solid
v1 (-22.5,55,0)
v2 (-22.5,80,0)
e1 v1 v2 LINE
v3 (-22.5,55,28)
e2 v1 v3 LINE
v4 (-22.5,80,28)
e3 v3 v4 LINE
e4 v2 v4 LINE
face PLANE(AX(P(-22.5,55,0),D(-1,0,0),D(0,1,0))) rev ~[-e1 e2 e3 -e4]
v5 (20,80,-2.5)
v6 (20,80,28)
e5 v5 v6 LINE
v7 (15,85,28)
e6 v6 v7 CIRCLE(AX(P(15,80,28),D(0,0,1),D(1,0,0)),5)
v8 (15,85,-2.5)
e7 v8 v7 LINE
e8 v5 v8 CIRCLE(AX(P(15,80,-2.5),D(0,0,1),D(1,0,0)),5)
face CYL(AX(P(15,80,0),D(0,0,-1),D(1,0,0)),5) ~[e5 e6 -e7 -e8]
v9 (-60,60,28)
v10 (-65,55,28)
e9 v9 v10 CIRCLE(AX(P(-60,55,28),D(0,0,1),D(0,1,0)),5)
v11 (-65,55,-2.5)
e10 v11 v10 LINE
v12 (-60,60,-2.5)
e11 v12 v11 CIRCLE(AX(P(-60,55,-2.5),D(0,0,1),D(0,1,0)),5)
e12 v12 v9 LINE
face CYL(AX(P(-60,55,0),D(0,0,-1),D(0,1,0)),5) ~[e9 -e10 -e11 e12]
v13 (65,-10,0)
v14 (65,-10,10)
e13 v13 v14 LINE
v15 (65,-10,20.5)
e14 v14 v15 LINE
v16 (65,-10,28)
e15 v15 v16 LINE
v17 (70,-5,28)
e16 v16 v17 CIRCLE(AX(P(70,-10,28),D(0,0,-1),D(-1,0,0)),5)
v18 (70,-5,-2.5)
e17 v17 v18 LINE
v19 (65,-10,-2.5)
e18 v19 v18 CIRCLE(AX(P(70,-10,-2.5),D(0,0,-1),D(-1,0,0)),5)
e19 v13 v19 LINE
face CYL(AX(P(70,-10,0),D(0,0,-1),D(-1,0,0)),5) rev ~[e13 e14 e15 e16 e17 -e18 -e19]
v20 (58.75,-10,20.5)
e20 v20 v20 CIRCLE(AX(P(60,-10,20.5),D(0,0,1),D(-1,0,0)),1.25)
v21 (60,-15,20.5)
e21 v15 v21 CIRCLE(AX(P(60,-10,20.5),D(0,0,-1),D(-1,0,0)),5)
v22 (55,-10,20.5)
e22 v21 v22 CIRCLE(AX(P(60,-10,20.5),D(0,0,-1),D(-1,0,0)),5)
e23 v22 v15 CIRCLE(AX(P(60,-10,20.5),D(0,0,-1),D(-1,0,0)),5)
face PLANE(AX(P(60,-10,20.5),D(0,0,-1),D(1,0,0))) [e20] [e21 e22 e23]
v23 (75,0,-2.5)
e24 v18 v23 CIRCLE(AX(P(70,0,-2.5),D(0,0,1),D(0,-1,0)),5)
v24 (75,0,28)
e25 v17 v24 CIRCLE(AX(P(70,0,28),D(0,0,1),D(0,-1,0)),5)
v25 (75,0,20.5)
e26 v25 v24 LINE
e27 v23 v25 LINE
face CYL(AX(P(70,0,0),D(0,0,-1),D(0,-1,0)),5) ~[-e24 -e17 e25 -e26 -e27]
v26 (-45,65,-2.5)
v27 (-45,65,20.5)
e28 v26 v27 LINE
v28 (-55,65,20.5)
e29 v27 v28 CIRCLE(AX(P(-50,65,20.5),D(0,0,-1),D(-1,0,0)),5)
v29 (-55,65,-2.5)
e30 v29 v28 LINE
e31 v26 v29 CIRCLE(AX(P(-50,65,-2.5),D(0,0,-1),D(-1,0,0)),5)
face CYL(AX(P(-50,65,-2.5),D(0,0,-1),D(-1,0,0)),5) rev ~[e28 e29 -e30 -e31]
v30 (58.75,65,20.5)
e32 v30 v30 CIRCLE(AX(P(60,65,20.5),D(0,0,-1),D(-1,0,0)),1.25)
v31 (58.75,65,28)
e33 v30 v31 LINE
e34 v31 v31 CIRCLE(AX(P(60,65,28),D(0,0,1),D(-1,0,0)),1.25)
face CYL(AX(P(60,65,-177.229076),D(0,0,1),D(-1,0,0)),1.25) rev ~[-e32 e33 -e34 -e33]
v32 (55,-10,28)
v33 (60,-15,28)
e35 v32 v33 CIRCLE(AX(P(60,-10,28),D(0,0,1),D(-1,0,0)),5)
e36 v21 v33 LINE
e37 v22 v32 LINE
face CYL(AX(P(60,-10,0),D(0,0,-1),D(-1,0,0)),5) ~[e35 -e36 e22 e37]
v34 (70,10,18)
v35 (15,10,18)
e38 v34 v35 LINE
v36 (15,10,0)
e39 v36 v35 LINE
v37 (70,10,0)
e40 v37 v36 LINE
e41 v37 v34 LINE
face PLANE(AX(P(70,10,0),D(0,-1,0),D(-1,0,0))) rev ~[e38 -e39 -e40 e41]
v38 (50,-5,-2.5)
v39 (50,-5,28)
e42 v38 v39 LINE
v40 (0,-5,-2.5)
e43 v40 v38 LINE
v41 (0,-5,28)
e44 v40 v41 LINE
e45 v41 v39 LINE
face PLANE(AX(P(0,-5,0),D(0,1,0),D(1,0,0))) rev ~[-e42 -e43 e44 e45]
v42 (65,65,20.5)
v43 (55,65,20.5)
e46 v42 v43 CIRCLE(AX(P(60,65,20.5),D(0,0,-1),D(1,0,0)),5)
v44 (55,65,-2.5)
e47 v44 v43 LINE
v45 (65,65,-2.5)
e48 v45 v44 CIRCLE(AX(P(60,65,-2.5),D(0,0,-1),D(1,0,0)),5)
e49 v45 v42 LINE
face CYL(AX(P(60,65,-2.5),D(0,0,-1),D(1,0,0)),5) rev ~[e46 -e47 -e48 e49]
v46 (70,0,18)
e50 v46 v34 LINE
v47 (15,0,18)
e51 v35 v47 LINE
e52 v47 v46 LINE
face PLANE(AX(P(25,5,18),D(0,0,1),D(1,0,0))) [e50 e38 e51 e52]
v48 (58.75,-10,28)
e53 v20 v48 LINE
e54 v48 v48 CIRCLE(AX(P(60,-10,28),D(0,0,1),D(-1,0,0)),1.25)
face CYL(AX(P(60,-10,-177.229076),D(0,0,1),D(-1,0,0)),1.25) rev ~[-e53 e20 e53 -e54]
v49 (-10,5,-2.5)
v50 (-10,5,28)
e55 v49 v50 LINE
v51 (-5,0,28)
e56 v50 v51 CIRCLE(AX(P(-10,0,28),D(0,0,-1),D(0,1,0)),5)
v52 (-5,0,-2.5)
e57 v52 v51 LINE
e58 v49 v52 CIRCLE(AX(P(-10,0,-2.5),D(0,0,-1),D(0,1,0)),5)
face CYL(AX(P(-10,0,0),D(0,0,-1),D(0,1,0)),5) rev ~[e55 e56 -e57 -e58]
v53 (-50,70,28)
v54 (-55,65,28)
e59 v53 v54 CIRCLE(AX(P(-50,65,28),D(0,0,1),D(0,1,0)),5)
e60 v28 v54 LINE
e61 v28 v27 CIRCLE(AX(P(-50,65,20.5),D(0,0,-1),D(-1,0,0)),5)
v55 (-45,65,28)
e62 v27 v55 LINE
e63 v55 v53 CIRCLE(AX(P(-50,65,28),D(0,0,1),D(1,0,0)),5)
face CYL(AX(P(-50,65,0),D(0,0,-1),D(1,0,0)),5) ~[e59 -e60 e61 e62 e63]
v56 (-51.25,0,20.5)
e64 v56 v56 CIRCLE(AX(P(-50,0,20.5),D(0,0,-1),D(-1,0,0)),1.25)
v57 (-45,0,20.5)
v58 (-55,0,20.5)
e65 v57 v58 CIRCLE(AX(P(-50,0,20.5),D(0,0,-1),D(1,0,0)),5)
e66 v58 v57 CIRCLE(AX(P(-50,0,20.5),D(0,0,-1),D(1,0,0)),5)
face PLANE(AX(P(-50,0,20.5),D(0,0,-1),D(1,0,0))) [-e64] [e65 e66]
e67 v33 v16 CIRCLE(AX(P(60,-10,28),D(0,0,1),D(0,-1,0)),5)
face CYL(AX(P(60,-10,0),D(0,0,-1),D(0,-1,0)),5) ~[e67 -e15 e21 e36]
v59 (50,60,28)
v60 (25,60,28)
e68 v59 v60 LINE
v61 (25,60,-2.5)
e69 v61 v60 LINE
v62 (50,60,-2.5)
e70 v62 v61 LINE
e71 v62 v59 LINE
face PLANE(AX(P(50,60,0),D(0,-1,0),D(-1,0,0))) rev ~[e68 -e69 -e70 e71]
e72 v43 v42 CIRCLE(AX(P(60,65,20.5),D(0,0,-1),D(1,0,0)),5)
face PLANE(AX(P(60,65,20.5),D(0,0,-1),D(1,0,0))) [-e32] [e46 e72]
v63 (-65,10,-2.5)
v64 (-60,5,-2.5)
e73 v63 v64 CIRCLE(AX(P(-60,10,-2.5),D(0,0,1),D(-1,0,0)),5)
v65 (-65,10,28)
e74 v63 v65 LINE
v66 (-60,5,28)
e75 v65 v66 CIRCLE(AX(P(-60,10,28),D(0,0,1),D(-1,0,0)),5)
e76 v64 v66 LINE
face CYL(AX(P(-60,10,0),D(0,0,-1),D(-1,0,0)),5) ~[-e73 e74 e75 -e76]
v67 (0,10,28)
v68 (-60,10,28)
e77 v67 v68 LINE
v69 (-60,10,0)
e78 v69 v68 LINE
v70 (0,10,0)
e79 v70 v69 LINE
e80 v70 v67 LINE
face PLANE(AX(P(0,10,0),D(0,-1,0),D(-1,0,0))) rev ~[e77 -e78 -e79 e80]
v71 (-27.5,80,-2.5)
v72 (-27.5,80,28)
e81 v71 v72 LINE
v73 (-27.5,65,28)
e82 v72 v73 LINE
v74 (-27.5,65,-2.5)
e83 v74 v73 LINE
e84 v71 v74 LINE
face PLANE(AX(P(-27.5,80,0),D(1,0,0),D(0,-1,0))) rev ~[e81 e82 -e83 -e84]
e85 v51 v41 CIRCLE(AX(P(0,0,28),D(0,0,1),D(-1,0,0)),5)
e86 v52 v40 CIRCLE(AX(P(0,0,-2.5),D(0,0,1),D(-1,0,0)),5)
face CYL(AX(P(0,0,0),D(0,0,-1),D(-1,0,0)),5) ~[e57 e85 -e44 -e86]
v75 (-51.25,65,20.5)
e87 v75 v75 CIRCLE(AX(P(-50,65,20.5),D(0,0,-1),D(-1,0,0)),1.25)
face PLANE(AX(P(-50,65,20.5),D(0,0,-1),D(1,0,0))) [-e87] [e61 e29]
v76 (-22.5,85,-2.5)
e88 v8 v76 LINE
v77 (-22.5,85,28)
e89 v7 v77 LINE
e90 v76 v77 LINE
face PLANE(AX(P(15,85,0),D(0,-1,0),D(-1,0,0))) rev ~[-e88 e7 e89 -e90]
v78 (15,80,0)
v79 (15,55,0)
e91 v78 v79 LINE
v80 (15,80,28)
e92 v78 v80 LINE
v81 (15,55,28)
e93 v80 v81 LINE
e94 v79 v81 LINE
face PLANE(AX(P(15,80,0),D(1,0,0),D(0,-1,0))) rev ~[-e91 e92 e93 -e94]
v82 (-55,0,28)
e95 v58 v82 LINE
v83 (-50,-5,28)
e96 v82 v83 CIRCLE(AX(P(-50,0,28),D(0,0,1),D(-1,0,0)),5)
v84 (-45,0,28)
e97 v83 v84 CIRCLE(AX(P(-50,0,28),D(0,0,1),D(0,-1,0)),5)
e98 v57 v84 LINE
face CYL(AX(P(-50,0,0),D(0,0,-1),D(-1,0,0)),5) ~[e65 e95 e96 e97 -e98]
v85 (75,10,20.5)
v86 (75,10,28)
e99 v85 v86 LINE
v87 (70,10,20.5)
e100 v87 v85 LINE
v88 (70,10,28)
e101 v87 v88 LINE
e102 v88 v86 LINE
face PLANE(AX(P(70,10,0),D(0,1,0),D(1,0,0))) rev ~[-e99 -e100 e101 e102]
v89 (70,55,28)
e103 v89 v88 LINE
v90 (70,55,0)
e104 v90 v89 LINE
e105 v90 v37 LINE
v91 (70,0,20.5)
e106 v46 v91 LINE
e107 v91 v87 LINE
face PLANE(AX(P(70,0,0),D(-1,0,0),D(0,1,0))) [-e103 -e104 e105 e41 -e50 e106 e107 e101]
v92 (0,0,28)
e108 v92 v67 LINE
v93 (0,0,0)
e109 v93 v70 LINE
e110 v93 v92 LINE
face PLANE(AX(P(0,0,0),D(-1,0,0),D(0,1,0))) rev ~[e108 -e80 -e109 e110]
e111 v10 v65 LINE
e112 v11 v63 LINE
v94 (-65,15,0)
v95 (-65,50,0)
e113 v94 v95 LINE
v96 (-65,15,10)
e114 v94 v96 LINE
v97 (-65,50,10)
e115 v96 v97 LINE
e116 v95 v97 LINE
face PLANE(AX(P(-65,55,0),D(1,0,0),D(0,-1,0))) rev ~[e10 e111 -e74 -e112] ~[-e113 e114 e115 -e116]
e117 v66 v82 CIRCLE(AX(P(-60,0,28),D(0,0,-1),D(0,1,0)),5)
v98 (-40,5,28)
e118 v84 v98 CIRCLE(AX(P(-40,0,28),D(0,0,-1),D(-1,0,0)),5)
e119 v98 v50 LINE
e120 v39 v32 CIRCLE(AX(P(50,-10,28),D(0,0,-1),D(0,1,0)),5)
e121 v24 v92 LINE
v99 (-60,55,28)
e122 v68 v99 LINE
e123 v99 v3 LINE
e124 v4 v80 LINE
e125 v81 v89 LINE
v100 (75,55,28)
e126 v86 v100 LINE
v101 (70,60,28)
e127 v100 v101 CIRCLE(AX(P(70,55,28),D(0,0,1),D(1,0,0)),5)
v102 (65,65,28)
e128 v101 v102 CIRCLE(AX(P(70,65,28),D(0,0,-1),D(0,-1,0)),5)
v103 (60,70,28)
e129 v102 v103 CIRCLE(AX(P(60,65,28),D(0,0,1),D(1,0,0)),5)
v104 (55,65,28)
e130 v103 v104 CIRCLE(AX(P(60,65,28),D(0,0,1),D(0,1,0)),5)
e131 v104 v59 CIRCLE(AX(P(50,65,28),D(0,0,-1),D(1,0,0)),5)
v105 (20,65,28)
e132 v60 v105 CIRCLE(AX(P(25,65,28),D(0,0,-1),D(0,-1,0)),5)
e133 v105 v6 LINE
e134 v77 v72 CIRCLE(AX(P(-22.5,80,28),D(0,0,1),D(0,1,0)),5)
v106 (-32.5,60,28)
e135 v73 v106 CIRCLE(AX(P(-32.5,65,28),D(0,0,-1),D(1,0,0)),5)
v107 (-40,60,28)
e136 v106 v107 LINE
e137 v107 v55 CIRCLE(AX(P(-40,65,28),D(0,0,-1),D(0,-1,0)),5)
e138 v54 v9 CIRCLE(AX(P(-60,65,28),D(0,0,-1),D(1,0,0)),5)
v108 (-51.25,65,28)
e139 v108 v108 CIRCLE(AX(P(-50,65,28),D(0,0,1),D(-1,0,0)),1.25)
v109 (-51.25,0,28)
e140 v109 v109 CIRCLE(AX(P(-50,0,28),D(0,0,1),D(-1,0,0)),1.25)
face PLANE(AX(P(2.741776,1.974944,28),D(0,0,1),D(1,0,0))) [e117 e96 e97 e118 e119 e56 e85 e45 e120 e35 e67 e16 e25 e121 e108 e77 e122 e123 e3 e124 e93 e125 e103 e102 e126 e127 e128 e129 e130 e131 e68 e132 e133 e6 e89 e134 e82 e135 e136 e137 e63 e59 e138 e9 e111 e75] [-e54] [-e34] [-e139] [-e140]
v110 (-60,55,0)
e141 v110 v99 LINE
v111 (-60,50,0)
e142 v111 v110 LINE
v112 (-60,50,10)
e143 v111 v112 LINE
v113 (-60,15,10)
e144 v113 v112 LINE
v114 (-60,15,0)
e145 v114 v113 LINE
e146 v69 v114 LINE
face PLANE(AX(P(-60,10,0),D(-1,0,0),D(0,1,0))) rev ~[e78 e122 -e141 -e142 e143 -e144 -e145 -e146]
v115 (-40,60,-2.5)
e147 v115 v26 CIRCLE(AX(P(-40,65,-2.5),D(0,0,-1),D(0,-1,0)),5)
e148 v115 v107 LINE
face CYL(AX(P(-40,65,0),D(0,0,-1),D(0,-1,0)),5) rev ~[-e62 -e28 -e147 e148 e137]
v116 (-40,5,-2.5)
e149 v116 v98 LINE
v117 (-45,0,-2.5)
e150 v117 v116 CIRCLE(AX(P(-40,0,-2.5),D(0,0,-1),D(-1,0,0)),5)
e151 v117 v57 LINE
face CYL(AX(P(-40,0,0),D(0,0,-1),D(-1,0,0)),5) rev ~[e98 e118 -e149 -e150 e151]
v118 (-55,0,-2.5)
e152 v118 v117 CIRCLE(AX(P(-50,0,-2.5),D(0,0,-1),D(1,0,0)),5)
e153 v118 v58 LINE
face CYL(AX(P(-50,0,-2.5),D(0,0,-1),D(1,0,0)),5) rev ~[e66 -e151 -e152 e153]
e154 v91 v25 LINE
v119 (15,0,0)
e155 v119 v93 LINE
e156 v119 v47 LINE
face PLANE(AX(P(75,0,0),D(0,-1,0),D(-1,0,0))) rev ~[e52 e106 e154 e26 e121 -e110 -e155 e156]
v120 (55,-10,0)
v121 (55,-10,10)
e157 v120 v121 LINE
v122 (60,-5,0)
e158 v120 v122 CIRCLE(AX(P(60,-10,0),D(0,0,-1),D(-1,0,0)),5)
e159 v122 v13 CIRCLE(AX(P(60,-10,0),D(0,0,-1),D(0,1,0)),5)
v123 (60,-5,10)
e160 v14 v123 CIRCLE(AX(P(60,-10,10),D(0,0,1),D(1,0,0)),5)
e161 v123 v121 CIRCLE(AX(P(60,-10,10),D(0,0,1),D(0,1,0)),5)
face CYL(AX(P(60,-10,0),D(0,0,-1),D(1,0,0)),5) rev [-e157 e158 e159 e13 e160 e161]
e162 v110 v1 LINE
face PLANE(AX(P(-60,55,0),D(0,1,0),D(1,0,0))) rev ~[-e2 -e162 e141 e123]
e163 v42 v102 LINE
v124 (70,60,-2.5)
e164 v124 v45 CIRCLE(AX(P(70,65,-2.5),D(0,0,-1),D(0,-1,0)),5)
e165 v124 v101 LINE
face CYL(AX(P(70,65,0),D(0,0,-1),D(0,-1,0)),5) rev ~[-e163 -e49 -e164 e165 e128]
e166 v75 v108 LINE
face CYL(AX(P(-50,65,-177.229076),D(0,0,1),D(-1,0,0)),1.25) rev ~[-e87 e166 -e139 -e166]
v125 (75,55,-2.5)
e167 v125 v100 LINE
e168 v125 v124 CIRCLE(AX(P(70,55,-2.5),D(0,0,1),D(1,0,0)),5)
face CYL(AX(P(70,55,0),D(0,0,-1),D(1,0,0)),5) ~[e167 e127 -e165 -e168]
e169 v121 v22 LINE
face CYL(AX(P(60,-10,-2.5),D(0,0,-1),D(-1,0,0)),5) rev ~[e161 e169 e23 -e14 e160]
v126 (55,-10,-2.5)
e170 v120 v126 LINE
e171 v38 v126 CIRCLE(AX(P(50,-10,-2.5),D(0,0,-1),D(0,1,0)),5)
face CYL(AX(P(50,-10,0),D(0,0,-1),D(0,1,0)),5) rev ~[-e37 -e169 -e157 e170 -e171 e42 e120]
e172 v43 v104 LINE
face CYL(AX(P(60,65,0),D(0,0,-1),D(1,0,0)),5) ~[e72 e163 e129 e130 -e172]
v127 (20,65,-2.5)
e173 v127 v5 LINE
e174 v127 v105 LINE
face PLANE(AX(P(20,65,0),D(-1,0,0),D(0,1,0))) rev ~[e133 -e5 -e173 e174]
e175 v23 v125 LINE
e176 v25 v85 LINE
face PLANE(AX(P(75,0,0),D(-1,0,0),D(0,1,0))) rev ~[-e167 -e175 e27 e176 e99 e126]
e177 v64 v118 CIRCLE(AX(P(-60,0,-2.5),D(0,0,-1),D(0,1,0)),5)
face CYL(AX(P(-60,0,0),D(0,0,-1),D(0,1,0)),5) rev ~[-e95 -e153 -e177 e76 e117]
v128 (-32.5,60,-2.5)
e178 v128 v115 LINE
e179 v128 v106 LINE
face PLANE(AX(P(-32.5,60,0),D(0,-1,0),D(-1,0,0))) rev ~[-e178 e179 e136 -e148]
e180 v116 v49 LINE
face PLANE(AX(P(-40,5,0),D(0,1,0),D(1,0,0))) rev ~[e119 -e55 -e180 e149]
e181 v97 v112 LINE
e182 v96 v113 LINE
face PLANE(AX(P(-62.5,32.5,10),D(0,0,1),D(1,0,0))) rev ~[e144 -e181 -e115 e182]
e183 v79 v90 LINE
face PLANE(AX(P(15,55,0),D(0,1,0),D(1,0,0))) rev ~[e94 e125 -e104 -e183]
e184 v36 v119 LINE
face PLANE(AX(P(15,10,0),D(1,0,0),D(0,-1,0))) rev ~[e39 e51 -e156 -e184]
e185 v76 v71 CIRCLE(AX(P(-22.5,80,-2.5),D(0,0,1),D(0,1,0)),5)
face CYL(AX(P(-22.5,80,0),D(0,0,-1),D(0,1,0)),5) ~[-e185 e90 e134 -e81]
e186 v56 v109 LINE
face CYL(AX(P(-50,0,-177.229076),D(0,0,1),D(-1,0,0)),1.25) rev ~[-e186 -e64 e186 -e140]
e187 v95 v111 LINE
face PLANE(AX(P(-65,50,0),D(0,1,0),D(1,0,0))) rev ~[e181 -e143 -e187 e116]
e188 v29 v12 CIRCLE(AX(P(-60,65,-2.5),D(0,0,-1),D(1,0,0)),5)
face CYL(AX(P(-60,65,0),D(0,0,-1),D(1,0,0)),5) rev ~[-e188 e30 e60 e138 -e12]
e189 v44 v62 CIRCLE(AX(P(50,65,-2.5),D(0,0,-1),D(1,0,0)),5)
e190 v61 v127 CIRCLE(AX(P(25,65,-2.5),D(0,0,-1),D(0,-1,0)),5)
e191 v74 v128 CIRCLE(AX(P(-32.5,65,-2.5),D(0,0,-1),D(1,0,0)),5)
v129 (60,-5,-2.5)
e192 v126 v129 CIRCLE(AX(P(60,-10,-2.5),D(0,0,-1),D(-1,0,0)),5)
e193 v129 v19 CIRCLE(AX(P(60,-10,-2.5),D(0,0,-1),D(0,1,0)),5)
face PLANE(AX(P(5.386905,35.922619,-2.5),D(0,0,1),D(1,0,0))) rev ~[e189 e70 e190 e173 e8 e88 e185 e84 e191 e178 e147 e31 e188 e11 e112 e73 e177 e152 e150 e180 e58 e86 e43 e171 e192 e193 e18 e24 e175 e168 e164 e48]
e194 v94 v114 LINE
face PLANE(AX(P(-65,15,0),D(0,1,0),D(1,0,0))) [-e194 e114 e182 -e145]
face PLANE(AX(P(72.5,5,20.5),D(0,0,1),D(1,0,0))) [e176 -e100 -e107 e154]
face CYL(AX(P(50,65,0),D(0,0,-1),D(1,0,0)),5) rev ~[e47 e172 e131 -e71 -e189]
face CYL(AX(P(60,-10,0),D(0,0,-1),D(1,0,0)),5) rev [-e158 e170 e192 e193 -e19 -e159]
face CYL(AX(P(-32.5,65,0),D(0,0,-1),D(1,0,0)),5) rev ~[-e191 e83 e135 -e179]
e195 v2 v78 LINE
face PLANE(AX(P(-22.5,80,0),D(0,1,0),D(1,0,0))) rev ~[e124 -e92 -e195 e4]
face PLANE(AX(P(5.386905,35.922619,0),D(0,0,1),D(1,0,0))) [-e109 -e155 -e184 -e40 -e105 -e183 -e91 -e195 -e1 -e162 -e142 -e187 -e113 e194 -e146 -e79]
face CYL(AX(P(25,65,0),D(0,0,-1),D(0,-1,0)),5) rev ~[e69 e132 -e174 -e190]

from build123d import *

# Parameters (mm, degrees)
F1_W      = 5
F1_H      = 10
F1_H_2    = 35
F2_DEPTH  = 2.5
F3_DEPTH  = 28
F5_D      = 2.5
F6_DEPTH  = 20.5
F7_DEPTH  = 18
F8_DEPTH  = 10
F9_R      = 1.25
F10_DEPTH = 23


with BuildPart() as f2:
    # F1 (on Top) → F2 (new body)
    with BuildSketch(Plane.XY):
        Polygon((0, 0), (70, 0), (70, 10), (70, 55), (15, 55), (15, 80), (-22.5, 80), (-22.5, 55), (-60, 55), (-60, 50), (-60, 15), (-60, 10), (0, 10), align=None)
        with BuildLine():
            Line((70, 10), (75, 10))
            Line((75, 10), (75, 55))
            ThreePointArc((75, 55), (73.5355339059, 58.5355339059), (70, 60))
            ThreePointArc((70, 60), (66.4644660941, 61.4644660941), (65, 65))
            ThreePointArc((65, 65), (60, 60), (55, 65))
            ThreePointArc((55, 65), (53.5355339059, 61.4644660941), (50, 60))
            Line((50, 60), (25, 60))
            ThreePointArc((25, 60), (21.4644660941, 61.4644660941), (20, 65))
            Line((20, 65), (20, 80))
            ThreePointArc((20, 80), (18.5355339059, 83.5355339059), (15, 85))
            Line((15, 85), (-22.5, 85))
            ThreePointArc((-22.5, 85), (-26.0355339059, 83.5355339059), (-27.5, 80))
            Line((-27.5, 80), (-27.5, 65))
            ThreePointArc((-27.5, 65), (-28.9644660941, 61.4644660941), (-32.5, 60))
            Line((-32.5, 60), (-40, 60))
            ThreePointArc((-40, 60), (-43.5355339059, 61.4644660941), (-45, 65))
            ThreePointArc((-45, 65), (-50, 60), (-55, 65))
            ThreePointArc((-55, 65), (-56.4644660941, 61.4644660941), (-60, 60))
            ThreePointArc((-60, 60), (-63.5355339059, 58.5355339059), (-65, 55))
            Line((-65, 55), (-65, 50))
            Line((-65, 50), (-60, 50))
            Line((-60, 50), (-60, 55))
            Line((-60, 55), (-22.5, 55))
            Line((-22.5, 55), (-22.5, 80))
            Line((-22.5, 80), (15, 80))
            Line((15, 80), (15, 55))
            Line((15, 55), (70, 55))
            Line((70, 55), (70, 10))
        make_face()
        with Locations((72.5, 5)):
            Rectangle(F1_W, F1_H)
        with BuildLine():
            ThreePointArc((-50, 70), (-53.5355339059, 68.5355339059), (-55, 65))
            ThreePointArc((-55, 65), (-50, 60), (-45, 65))
            ThreePointArc((-45, 65), (-46.4644660941, 68.5355339059), (-50, 70))
        make_face()
        with BuildLine():
            ThreePointArc((55, 65), (60, 60), (65, 65))
            ThreePointArc((65, 65), (63.5355339059, 68.5355339059), (60, 70))
            ThreePointArc((60, 70), (56.4644660941, 68.5355339059), (55, 65))
        make_face()
        with BuildLine():
            ThreePointArc((-45, 0), (-50, 5), (-55, 0))
            ThreePointArc((-55, 0), (-53.5355339059, -3.5355339059), (-50, -5))
            ThreePointArc((-50, -5), (-46.4644660941, -3.5355339059), (-45, 0))
        make_face()
        with Locations((-62.5, 32.5)):
            Rectangle(F1_W, F1_H_2)
        with BuildLine():
            ThreePointArc((70, -5), (73.5355339059, -3.5355339059), (75, 0))
            Line((75, 0), (70, 0))
            Line((70, 0), (0, 0))
            Line((0, 0), (0, 10))
            Line((0, 10), (-60, 10))
            Line((-60, 10), (-60, 15))
            Line((-60, 15), (-65, 15))
            Line((-65, 15), (-65, 10))
            ThreePointArc((-65, 10), (-63.5355339059, 6.4644660941), (-60, 5))
            ThreePointArc((-60, 5), (-56.4644660941, 3.5355339059), (-55, 0))
            ThreePointArc((-55, 0), (-50, 5), (-45, 0))
            ThreePointArc((-45, 0), (-43.5355339059, 3.5355339059), (-40, 5))
            Line((-40, 5), (-10, 5))
            ThreePointArc((-10, 5), (-6.4644660941, 3.5355339059), (-5, 0))
            ThreePointArc((-5, 0), (-3.5355339059, -3.5355339059), (0, -5))
            Line((0, -5), (50, -5))
            ThreePointArc((50, -5), (53.5355339059, -6.4644660941), (55, -10))
            ThreePointArc((55, -10), (56.4644660941, -6.4644660941), (60, -5))
            ThreePointArc((60, -5), (63.5355339059, -6.4644660941), (65, -10))
            ThreePointArc((65, -10), (66.4644660941, -6.4644660941), (70, -5))
        make_face()
    extrude(amount=-F2_DEPTH)

    # F1 (on Top) → F3 (join)
    with BuildSketch(Plane.XY):
        with BuildLine():
            ThreePointArc((70, -5), (73.5355339059, -3.5355339059), (75, 0))
            Line((75, 0), (70, 0))
            Line((70, 0), (0, 0))
            Line((0, 0), (0, 10))
            Line((0, 10), (-60, 10))
            Line((-60, 10), (-60, 15))
            Line((-60, 15), (-65, 15))
            Line((-65, 15), (-65, 10))
            ThreePointArc((-65, 10), (-63.5355339059, 6.4644660941), (-60, 5))
            ThreePointArc((-60, 5), (-56.4644660941, 3.5355339059), (-55, 0))
            ThreePointArc((-55, 0), (-50, 5), (-45, 0))
            ThreePointArc((-45, 0), (-43.5355339059, 3.5355339059), (-40, 5))
            Line((-40, 5), (-10, 5))
            ThreePointArc((-10, 5), (-6.4644660941, 3.5355339059), (-5, 0))
            ThreePointArc((-5, 0), (-3.5355339059, -3.5355339059), (0, -5))
            Line((0, -5), (50, -5))
            ThreePointArc((50, -5), (53.5355339059, -6.4644660941), (55, -10))
            ThreePointArc((55, -10), (56.4644660941, -6.4644660941), (60, -5))
            ThreePointArc((60, -5), (63.5355339059, -6.4644660941), (65, -10))
            ThreePointArc((65, -10), (66.4644660941, -6.4644660941), (70, -5))
        make_face()
        with BuildLine():
            Line((70, 10), (75, 10))
            Line((75, 10), (75, 55))
            ThreePointArc((75, 55), (73.5355339059, 58.5355339059), (70, 60))
            ThreePointArc((70, 60), (66.4644660941, 61.4644660941), (65, 65))
            ThreePointArc((65, 65), (60, 60), (55, 65))
            ThreePointArc((55, 65), (53.5355339059, 61.4644660941), (50, 60))
            Line((50, 60), (25, 60))
            ThreePointArc((25, 60), (21.4644660941, 61.4644660941), (20, 65))
            Line((20, 65), (20, 80))
            ThreePointArc((20, 80), (18.5355339059, 83.5355339059), (15, 85))
            Line((15, 85), (-22.5, 85))
            ThreePointArc((-22.5, 85), (-26.0355339059, 83.5355339059), (-27.5, 80))
            Line((-27.5, 80), (-27.5, 65))
            ThreePointArc((-27.5, 65), (-28.9644660941, 61.4644660941), (-32.5, 60))
            Line((-32.5, 60), (-40, 60))
            ThreePointArc((-40, 60), (-43.5355339059, 61.4644660941), (-45, 65))
            ThreePointArc((-45, 65), (-50, 60), (-55, 65))
            ThreePointArc((-55, 65), (-56.4644660941, 61.4644660941), (-60, 60))
            ThreePointArc((-60, 60), (-63.5355339059, 58.5355339059), (-65, 55))
            Line((-65, 55), (-65, 50))
            Line((-65, 50), (-60, 50))
            Line((-60, 50), (-60, 55))
            Line((-60, 55), (-22.5, 55))
            Line((-22.5, 55), (-22.5, 80))
            Line((-22.5, 80), (15, 80))
            Line((15, 80), (15, 55))
            Line((15, 55), (70, 55))
            Line((70, 55), (70, 10))
        make_face()
        with BuildLine():
            ThreePointArc((60, -15), (63.5355339059, -13.5355339059), (65, -10))
            ThreePointArc((65, -10), (63.5355339059, -6.4644660941), (60, -5))
            ThreePointArc((60, -5), (56.4644660941, -6.4644660941), (55, -10))
            ThreePointArc((55, -10), (56.4644660941, -13.5355339059), (60, -15))
        make_face()
        with BuildLine():
            ThreePointArc((55, 65), (60, 60), (65, 65))
            ThreePointArc((65, 65), (63.5355339059, 68.5355339059), (60, 70))
            ThreePointArc((60, 70), (56.4644660941, 68.5355339059), (55, 65))
        make_face()
        with Locations((-62.5, 32.5)):
            Rectangle(F1_W, F1_H_2)
        with BuildLine():
            ThreePointArc((-45, 0), (-50, 5), (-55, 0))
            ThreePointArc((-55, 0), (-53.5355339059, -3.5355339059), (-50, -5))
            ThreePointArc((-50, -5), (-46.4644660941, -3.5355339059), (-45, 0))
        make_face()
        with BuildLine():
            ThreePointArc((-50, 70), (-53.5355339059, 68.5355339059), (-55, 65))
            ThreePointArc((-55, 65), (-50, 60), (-45, 65))
            ThreePointArc((-45, 65), (-46.4644660941, 68.5355339059), (-50, 70))
        make_face()
    extrude(amount=F3_DEPTH)

    # F5 (through all)
    with Locations(Plane(origin=(0, 0, -2.5), x_dir=(1, 0, 0), z_dir=(0, 0, -1))):
        with Locations((-50, 0), (60, 10), (60, -65), (-50, -65)):
            Hole(F5_D / 2)

    # F1 (on Top) → F6 (join)
    with BuildSketch(Plane.XY):
        with Locations((72.5, 5)):
            Rectangle(F1_W, F1_H)
    extrude(amount=F6_DEPTH)

    # F0 (on Top) → F7 (join)
    with BuildSketch(Plane.XY):
        Polygon((15, 5), (15, 0), (35, 0), (35, 5), (35, 10), (15, 10), align=None)
        Polygon((35, 5), (35, 0), (70, 0), (70, 10), (35, 10), align=None)
    extrude(amount=F7_DEPTH)

    # F1 (on Top) → F8 (cut)
    with BuildSketch(Plane.XY):
        with BuildLine():
            ThreePointArc((60, -15), (63.5355339059, -13.5355339059), (65, -10))
            ThreePointArc((65, -10), (63.5355339059, -6.4644660941), (60, -5))
            ThreePointArc((60, -5), (56.4644660941, -6.4644660941), (55, -10))
            ThreePointArc((55, -10), (56.4644660941, -13.5355339059), (60, -15))
        make_face()
        with Locations((-62.5, 32.5)):
            Rectangle(F1_W, F1_H_2)
    extrude(amount=F8_DEPTH, mode=Mode.SUBTRACT)

    # F9 (on face) → F10 (cut)
    with BuildSketch(Plane(origin=(0, 0, -2.5), x_dir=(1, 0, 0), z_dir=(0, 0, -1))):
        with BuildLine():
            ThreePointArc((-55, 0), (-50, -5), (-45, 0))
            ThreePointArc((-45, 0), (-50, 5), (-55, 0))
        make_face()
        with Locations((-50, 0)):
            Circle(F9_R, mode=Mode.SUBTRACT)
        with BuildLine():
            ThreePointArc((-45, -65), (-50, -60), (-55, -65))
            ThreePointArc((-55, -65), (-50, -70), (-45, -65))
        make_face()
        with Locations((-50, -65)):
            Circle(F9_R, mode=Mode.SUBTRACT)
        with BuildLine():
            ThreePointArc((65, 10), (60, 15), (55, 10))
            ThreePointArc((55, 10), (60, 5), (65, 10))
        make_face()
        with BuildLine():
            ThreePointArc((55, -65), (60, -70), (65, -65))
            ThreePointArc((65, -65), (60, -60), (55, -65))
        make_face()
        with Locations((60, -65)):
            Circle(F9_R, mode=Mode.SUBTRACT)
    extrude(amount=-F10_DEPTH, mode=Mode.SUBTRACT)


solid = f2.part
